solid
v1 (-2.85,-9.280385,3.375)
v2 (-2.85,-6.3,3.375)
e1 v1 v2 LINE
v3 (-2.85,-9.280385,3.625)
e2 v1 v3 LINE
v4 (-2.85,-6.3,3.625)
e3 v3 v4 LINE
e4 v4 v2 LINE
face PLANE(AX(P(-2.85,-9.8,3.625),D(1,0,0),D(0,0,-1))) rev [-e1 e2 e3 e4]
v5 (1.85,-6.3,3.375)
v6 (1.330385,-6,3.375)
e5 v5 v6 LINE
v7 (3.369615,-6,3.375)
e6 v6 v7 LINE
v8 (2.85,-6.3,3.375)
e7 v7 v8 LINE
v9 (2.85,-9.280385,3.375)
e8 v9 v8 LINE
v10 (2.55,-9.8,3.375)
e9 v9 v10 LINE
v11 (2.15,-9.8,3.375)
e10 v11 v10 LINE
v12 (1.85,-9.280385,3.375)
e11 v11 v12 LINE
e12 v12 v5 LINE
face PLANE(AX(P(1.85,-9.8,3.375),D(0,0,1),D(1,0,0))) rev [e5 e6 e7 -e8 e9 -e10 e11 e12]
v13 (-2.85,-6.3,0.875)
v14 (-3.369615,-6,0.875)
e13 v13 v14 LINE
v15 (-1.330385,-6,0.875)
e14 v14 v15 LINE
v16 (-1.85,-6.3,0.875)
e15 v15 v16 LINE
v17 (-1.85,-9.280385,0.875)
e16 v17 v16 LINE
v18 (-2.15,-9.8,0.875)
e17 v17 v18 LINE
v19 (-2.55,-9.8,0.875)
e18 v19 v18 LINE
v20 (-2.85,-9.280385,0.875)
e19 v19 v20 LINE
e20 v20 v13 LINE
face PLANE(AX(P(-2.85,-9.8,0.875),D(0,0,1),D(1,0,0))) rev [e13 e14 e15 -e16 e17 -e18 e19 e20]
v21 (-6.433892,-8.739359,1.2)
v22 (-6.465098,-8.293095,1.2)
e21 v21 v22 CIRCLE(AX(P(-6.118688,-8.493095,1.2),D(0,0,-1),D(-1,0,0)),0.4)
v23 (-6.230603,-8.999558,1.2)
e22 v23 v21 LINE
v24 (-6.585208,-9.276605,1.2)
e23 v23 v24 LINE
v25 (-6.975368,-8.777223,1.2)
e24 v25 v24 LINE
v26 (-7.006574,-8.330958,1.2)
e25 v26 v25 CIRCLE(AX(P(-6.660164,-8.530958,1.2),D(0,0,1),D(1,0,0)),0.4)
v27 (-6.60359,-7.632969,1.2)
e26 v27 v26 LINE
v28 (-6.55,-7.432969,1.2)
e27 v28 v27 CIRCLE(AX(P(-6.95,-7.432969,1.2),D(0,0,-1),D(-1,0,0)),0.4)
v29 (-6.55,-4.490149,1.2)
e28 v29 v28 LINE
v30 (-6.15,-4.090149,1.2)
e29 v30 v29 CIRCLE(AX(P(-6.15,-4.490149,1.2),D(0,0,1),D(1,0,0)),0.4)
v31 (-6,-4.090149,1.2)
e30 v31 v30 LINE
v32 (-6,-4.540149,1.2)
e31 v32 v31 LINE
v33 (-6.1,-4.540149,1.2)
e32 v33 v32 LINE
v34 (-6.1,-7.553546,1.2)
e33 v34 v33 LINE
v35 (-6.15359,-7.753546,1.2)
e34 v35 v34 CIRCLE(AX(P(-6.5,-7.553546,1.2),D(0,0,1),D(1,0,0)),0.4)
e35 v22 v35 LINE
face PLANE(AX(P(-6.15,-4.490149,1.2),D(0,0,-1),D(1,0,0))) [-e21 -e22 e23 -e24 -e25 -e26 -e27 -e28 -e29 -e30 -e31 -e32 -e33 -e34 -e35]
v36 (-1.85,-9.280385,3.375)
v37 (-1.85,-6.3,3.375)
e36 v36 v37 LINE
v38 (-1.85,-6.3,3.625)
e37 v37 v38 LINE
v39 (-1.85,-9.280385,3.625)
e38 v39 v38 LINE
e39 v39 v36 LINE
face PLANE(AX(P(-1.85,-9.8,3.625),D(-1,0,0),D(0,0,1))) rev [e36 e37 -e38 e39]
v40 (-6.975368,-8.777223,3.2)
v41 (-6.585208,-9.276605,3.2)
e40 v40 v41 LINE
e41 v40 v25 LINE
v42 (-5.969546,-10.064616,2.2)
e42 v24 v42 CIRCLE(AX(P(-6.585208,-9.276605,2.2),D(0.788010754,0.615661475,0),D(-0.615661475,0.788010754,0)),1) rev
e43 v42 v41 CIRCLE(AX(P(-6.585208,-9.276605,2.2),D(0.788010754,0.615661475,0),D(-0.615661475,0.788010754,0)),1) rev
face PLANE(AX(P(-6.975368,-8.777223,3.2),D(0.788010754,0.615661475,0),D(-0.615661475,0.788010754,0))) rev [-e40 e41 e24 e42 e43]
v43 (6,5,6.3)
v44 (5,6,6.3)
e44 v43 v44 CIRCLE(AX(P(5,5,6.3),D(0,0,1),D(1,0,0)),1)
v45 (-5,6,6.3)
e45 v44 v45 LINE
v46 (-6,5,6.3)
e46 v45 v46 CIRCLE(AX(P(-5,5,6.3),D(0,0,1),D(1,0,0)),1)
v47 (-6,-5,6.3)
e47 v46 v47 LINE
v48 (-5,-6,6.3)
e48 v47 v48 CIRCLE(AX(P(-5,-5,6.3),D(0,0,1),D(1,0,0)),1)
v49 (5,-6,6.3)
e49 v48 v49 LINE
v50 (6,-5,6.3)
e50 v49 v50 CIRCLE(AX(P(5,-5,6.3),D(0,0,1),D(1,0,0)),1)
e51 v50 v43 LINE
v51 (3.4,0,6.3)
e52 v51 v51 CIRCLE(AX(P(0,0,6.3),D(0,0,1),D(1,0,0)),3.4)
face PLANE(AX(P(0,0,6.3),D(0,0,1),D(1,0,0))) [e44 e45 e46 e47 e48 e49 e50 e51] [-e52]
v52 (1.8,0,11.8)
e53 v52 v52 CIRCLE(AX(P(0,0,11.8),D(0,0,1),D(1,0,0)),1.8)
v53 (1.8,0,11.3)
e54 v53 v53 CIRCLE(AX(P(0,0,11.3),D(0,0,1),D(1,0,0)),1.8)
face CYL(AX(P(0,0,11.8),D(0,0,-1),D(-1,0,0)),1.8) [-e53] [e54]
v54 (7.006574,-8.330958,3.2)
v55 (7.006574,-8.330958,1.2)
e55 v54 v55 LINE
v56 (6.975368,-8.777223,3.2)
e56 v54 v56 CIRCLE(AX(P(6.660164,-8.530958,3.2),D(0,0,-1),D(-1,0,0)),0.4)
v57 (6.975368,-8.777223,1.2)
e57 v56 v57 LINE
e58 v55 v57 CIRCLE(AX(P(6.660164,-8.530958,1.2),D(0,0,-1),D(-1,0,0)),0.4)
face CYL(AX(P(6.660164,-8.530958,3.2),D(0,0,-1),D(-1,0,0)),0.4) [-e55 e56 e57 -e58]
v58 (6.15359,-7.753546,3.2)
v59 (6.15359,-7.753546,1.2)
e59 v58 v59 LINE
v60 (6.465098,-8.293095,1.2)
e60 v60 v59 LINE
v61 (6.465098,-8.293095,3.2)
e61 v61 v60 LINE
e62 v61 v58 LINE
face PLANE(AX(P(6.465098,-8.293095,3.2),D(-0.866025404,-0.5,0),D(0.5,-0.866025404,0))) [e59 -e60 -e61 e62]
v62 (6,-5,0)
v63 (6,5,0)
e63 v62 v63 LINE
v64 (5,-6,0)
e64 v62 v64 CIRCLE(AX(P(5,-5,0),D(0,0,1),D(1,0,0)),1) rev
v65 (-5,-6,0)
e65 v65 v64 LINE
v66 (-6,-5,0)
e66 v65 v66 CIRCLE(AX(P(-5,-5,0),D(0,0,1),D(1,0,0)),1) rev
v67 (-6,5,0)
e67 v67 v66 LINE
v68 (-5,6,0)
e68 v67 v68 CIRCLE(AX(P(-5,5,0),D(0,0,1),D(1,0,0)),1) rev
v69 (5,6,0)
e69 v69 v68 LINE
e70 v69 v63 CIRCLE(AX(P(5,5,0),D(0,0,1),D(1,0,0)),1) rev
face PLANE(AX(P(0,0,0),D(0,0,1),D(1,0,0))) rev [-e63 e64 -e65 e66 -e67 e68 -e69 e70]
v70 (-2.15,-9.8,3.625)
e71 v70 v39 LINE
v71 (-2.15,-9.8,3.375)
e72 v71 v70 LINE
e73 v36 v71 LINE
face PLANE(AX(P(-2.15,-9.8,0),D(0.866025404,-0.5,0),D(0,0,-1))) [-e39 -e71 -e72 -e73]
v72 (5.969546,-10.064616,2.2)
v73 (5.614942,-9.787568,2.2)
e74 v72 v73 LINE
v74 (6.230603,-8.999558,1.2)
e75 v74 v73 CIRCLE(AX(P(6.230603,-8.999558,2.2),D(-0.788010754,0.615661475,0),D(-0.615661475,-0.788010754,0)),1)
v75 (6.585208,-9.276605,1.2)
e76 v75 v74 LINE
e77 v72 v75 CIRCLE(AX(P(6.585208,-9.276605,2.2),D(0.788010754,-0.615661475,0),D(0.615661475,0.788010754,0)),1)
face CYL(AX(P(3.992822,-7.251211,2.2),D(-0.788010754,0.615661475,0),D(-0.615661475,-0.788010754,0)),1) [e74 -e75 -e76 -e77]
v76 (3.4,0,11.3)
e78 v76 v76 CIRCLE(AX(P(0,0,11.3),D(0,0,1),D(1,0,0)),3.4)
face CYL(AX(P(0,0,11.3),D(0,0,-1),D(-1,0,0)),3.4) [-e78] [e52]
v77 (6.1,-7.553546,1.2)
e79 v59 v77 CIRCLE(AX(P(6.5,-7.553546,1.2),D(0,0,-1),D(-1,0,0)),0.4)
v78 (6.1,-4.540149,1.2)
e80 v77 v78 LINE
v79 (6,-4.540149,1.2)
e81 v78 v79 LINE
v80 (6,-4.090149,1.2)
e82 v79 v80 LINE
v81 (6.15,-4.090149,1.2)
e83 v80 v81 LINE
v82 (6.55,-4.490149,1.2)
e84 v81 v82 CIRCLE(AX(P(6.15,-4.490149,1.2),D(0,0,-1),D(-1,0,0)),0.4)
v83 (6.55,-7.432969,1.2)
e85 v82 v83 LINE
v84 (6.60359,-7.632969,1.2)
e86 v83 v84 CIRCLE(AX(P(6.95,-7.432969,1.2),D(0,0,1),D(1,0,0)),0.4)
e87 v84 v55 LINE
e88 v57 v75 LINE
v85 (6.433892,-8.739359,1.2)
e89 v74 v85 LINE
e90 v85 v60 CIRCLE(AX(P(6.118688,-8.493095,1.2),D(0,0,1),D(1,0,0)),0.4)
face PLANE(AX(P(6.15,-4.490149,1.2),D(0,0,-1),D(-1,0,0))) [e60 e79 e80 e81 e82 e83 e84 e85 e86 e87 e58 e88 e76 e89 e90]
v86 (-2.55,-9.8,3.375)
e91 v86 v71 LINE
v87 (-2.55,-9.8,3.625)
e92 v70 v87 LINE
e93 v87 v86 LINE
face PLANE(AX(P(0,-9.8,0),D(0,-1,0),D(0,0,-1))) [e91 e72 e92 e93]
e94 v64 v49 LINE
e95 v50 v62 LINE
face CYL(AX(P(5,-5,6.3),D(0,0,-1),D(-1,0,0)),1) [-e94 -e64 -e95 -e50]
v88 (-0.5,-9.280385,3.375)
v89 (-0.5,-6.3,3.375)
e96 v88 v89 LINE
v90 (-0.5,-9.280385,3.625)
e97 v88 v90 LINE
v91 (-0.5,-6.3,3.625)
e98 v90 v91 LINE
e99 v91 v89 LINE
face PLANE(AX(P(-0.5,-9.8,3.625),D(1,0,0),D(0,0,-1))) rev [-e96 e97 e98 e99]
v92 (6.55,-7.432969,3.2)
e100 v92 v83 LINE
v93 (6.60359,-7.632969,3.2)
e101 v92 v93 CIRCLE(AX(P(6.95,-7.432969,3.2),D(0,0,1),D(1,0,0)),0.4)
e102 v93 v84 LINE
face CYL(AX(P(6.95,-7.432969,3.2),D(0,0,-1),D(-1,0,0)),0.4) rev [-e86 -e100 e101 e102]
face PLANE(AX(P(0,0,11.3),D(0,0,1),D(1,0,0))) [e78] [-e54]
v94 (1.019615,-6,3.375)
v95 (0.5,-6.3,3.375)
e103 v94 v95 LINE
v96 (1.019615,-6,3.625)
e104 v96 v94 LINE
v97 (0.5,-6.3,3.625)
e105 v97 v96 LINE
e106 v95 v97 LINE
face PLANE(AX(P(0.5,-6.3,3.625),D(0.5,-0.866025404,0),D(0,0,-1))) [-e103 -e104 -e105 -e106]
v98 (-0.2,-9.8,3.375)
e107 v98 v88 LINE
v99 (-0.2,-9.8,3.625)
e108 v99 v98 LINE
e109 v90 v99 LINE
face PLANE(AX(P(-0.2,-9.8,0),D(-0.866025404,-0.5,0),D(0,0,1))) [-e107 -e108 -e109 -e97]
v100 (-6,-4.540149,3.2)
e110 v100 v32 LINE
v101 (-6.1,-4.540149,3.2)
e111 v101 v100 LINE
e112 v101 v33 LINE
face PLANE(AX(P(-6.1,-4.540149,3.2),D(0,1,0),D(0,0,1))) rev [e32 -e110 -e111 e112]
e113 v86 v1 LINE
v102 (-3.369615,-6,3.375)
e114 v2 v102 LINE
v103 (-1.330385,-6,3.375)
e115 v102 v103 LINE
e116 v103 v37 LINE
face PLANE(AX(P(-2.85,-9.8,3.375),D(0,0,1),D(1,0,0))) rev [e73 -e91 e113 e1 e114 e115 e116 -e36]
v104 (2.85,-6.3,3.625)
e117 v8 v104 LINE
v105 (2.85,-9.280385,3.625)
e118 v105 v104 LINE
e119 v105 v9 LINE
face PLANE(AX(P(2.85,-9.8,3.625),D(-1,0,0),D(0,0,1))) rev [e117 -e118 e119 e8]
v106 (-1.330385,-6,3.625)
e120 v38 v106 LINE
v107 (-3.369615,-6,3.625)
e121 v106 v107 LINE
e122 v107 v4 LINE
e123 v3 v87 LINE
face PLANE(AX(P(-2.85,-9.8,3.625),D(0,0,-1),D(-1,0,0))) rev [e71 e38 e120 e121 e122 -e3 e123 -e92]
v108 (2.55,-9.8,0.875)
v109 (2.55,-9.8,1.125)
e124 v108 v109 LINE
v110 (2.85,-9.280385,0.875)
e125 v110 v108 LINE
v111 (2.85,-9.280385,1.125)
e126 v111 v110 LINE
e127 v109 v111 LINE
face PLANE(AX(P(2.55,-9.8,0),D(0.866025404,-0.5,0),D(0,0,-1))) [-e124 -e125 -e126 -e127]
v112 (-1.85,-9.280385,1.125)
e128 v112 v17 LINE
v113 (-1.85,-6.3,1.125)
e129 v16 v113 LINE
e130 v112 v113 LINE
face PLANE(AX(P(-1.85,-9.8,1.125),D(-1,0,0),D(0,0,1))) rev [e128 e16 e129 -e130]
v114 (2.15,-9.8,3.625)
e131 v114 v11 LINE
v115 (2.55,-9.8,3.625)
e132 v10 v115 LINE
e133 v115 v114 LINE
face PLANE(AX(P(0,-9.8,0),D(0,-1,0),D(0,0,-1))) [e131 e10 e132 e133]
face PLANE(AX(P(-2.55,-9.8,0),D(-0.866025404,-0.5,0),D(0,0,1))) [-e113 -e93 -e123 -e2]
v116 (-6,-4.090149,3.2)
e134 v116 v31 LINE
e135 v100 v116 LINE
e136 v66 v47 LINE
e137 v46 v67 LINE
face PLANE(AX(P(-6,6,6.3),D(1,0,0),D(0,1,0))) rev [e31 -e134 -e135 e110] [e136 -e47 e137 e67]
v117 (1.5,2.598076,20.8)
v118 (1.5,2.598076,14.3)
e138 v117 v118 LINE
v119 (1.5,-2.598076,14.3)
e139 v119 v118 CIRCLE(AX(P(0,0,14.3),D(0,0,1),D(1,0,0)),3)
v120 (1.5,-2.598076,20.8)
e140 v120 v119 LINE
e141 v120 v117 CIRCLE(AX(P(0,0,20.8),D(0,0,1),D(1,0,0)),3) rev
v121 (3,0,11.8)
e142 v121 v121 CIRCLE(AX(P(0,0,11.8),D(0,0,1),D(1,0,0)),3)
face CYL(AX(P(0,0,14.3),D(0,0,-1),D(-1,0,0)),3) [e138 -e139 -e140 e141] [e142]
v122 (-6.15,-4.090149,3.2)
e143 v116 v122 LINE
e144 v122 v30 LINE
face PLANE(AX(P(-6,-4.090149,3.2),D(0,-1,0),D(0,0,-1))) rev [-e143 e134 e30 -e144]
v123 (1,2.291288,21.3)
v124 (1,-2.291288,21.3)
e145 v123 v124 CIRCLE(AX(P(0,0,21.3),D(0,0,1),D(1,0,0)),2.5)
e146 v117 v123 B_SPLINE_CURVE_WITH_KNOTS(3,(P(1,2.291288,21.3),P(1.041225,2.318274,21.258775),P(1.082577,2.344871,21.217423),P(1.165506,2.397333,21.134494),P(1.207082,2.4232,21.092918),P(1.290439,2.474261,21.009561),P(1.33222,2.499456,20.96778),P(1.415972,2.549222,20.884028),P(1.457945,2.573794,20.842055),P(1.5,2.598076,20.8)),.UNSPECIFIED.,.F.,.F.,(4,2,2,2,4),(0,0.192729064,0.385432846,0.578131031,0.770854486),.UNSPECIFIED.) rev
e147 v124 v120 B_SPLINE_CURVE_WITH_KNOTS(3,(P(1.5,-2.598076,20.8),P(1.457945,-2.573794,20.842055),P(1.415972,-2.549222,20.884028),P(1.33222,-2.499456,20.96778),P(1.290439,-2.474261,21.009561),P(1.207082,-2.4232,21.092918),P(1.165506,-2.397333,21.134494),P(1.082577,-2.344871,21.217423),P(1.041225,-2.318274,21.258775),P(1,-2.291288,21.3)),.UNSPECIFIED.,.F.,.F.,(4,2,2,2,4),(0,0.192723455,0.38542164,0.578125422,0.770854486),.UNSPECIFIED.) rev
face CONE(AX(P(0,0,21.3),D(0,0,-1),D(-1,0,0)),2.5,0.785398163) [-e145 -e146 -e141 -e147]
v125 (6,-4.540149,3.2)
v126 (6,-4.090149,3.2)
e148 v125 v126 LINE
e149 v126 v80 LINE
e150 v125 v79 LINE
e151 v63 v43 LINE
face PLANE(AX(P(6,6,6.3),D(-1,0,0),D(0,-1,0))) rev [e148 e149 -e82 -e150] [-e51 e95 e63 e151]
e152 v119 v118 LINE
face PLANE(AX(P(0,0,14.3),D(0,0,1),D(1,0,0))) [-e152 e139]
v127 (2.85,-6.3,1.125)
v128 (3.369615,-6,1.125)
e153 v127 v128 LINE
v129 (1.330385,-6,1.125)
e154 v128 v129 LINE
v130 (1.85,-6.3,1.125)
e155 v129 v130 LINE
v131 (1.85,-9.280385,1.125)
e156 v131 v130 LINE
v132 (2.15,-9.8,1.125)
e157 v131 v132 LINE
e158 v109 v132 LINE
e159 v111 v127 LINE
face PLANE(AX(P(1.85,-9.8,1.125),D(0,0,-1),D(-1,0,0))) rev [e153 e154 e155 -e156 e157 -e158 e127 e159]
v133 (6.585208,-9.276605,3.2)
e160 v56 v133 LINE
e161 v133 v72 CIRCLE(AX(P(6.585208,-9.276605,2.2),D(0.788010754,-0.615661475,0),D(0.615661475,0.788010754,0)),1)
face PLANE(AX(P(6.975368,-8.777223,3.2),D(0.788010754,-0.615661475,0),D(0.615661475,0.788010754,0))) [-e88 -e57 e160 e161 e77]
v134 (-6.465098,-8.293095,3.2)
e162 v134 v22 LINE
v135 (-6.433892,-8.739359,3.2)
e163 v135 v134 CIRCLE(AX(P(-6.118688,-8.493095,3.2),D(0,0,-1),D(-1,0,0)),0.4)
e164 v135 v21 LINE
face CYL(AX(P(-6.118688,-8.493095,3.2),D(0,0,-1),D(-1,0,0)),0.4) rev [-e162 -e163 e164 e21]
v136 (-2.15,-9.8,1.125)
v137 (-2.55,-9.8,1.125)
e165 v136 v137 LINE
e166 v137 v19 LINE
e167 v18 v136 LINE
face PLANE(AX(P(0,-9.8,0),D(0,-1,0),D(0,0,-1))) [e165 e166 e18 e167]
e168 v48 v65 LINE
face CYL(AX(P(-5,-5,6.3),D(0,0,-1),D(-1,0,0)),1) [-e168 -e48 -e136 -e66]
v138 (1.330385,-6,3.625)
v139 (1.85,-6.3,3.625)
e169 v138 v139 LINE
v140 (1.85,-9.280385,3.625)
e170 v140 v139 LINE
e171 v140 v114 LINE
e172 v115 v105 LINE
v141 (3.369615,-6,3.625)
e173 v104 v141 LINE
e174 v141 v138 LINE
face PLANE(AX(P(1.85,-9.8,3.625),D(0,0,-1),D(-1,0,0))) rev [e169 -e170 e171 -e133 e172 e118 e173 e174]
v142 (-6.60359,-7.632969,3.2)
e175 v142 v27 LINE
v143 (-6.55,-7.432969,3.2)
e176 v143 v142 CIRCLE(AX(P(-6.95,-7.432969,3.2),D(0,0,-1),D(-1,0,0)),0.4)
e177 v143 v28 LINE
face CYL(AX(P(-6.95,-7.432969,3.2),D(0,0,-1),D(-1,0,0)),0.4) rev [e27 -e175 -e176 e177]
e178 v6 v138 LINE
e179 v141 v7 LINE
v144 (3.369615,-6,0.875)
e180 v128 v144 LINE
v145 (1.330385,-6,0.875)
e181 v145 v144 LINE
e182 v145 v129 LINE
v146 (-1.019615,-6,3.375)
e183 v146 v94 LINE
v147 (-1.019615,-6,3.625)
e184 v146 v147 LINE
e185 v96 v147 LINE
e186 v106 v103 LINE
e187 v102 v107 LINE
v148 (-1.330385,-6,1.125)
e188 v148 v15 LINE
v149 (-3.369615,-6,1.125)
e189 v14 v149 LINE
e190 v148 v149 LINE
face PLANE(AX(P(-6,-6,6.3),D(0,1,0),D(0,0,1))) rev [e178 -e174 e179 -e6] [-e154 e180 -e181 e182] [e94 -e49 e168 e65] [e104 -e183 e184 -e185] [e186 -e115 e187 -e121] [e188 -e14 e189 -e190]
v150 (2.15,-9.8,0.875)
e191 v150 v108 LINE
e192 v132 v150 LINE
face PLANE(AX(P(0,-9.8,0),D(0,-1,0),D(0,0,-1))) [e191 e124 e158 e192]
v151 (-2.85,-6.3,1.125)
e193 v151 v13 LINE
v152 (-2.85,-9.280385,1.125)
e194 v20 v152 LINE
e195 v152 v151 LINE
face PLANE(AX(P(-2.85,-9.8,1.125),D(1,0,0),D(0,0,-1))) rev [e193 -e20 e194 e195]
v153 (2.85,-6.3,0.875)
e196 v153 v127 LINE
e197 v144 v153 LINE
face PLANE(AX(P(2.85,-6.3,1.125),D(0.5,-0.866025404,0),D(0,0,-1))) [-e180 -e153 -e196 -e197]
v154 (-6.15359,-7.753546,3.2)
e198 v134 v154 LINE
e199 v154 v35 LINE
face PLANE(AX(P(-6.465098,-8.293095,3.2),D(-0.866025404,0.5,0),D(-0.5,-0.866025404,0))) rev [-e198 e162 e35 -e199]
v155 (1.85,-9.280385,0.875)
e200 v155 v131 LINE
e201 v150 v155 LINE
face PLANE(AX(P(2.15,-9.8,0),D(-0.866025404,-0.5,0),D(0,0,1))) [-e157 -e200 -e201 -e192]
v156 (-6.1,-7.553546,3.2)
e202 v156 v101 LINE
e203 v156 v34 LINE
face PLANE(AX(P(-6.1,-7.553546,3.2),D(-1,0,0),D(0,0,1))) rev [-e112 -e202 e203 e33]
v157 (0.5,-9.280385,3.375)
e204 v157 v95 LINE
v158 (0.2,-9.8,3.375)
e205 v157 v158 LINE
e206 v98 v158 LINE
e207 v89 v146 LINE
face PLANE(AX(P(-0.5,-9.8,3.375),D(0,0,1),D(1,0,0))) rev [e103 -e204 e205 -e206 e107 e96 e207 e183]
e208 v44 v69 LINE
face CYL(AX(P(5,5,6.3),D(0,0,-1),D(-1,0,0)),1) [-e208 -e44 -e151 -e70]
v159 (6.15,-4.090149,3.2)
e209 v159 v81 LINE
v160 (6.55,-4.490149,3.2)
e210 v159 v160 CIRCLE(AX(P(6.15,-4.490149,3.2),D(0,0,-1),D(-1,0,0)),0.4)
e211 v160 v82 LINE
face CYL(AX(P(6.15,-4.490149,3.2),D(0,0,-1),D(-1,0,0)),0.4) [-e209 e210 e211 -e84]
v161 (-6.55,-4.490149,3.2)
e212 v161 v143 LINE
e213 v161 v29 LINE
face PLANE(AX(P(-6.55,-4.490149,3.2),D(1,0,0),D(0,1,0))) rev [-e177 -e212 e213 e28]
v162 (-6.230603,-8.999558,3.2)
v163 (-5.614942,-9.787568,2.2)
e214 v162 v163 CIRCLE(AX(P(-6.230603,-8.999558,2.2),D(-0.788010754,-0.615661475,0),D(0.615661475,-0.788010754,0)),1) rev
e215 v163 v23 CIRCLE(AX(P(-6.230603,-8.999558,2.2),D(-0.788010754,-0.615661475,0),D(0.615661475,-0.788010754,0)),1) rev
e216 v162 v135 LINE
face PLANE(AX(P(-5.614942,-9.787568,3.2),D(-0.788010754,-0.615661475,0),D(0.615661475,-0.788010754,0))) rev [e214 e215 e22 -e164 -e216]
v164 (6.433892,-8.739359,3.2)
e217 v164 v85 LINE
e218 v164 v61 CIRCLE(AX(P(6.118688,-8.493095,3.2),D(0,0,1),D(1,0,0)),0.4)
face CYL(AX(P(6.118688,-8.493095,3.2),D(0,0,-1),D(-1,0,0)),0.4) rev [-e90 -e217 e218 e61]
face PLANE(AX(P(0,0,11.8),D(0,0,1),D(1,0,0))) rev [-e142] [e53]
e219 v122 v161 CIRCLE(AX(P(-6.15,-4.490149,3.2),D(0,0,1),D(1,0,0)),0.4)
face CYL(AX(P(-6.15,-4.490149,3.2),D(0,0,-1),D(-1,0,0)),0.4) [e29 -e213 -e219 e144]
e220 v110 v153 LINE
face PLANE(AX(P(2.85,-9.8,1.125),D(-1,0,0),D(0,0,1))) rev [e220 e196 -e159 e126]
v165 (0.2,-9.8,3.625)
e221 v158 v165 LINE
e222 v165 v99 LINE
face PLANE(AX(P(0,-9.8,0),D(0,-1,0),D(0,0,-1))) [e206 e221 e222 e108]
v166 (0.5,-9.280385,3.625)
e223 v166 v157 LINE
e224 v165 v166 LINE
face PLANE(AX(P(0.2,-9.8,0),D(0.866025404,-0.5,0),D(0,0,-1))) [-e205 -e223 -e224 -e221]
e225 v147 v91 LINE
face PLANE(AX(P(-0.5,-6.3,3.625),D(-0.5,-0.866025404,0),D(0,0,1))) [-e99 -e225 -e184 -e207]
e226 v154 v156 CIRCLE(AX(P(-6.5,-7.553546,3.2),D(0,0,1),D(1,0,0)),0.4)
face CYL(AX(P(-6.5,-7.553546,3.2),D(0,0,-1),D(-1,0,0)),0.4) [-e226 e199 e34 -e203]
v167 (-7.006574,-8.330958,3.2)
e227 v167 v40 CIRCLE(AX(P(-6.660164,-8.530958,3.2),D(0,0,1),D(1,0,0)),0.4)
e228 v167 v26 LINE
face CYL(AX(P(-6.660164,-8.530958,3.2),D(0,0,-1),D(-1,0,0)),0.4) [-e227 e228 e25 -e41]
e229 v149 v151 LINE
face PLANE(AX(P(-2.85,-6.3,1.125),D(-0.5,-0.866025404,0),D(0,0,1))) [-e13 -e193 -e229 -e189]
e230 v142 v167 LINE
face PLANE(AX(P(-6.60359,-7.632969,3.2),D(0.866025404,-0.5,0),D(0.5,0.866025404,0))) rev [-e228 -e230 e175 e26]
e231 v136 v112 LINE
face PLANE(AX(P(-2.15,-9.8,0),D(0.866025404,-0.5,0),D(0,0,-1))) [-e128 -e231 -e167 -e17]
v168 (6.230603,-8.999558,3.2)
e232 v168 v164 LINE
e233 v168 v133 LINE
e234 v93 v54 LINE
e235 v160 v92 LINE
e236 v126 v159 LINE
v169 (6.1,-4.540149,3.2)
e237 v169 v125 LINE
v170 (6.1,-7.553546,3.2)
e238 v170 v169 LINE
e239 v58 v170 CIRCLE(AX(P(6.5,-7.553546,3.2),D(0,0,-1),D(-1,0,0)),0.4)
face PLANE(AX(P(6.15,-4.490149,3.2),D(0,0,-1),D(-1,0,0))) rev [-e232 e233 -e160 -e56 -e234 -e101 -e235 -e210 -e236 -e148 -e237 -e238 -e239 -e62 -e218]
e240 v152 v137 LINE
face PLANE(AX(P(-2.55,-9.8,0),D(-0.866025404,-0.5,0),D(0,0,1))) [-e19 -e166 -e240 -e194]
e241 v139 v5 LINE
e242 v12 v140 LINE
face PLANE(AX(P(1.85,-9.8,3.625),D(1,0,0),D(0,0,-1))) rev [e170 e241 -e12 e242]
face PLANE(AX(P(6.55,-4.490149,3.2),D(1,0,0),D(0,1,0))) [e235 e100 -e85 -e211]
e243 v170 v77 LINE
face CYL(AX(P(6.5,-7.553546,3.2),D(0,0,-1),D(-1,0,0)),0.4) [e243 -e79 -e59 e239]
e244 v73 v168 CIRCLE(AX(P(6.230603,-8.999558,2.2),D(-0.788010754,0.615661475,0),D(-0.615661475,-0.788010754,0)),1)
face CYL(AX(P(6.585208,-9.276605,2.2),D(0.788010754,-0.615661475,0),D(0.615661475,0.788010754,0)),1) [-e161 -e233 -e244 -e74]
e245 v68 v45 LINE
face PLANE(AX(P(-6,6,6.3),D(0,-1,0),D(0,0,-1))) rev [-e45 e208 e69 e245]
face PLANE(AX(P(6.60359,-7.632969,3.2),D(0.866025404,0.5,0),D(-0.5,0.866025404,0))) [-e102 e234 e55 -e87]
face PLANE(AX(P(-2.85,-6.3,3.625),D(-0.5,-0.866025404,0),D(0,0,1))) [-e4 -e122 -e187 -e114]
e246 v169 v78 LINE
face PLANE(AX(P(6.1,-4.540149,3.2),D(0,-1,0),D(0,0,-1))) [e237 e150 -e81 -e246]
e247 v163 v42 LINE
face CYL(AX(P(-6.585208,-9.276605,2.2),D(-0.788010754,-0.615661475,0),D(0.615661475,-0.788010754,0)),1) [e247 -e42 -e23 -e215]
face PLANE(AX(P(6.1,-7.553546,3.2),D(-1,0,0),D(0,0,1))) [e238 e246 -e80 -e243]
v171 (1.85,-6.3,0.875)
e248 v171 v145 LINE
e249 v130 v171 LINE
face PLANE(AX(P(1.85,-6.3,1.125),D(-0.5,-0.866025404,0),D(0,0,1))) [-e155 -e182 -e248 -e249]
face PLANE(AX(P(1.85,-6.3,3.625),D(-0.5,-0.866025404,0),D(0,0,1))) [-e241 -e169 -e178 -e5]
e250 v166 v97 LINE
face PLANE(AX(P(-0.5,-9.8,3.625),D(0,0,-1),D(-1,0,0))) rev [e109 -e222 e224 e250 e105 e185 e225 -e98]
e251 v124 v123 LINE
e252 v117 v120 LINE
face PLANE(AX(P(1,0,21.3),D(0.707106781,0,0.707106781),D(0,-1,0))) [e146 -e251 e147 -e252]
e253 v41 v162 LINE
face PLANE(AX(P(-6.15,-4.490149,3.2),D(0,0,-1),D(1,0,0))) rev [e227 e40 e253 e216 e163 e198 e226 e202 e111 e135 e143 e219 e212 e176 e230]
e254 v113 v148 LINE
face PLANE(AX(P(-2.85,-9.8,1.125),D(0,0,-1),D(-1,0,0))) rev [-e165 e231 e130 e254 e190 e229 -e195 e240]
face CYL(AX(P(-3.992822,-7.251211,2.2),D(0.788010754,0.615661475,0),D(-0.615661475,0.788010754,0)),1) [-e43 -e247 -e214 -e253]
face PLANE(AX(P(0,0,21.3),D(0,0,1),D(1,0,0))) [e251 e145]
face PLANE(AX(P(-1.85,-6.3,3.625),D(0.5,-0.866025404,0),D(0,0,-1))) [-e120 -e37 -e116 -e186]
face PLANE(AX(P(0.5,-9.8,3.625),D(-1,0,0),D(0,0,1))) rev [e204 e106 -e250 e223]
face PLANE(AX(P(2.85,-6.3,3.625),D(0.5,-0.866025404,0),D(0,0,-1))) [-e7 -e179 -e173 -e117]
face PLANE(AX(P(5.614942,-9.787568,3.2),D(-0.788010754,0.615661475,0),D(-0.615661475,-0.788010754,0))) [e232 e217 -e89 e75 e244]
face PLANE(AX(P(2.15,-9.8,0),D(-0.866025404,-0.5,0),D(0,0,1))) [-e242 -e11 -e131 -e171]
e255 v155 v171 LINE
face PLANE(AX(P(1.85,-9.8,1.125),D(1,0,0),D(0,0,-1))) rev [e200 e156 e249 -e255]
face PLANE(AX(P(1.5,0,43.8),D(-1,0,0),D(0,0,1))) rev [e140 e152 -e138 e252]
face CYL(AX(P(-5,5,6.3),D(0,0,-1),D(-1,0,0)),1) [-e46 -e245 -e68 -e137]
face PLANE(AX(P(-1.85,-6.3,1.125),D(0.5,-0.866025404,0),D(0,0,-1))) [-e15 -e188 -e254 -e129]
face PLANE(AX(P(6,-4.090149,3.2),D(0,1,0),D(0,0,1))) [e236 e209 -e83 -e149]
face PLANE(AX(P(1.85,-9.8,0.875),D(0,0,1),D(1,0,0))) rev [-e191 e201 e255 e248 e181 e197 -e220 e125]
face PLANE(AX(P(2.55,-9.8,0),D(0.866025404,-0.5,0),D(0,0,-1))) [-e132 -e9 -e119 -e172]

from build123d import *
from OCP.BRepFilletAPI import BRepFilletAPI_MakeChamfer

# Parameters (mm, degrees)
ESQUISSE1_W           = 12
ESQUISSE1_H           = 12
BOSS_EXTRU_1_DEPTH    = 6.3
ESQUISSE2_R           = 3.4
BOSS_EXTRU_2_DEPTH    = 5
ESQUISSE5_R           = 1.8
BOSS_EXTRU_5_DEPTH    = 0.5
ESQUISSE3_R           = 3
BOSS_EXTRU_3_DEPTH    = 2.5
BOSS_EXTRU_6_START    = 2.5
BOSS_EXTRU_6_DEPTH    = 7
ESQUISSE4_W           = 1
ESQUISSE4_H           = 0.25
BOSS_EXTRU_4_DEPTH    = 3.8
CHANFREIN1_SIZE       = 0.5
CONG_1_R              = 1
CHANFREIN2_SIZE       = 0.3
CHANFREIN2_SIZE2      = 0.519615242
BOSS_EXTRU_7_START    = -1.2
BOSS_EXTRU_7_DEPTH    = 2
CONG_2_R              = 1
CONG_2_OF_SYM_TRIE1_R = 1


with BuildPart() as part:
    # Esquisse1 → Boss.-Extru.1 (new body)
    with BuildSketch(Plane.XY):
        Rectangle(ESQUISSE1_W, ESQUISSE1_H)
    extrude(amount=BOSS_EXTRU_1_DEPTH)

    # Esquisse2 → Boss.-Extru.2 (add)
    with BuildSketch(Plane.XY.offset(6.3)):
        Circle(ESQUISSE2_R)
    extrude(amount=BOSS_EXTRU_2_DEPTH)

    # Esquisse5 → Boss.-Extru.5 (add)
    with BuildSketch(Plane.XY.offset(11.3)):
        Circle(ESQUISSE5_R)
    extrude(amount=BOSS_EXTRU_5_DEPTH)

    # Esquisse3 → Boss.-Extru.3 (add)
    with BuildSketch(Plane.XY.offset(11.8)):
        Circle(ESQUISSE3_R)
    extrude(amount=BOSS_EXTRU_3_DEPTH)

    # Esquisse3<4> → Boss.-Extru.6 (add)
    with BuildSketch(Plane.XY.offset(11.8).offset(BOSS_EXTRU_6_START)):
        with BuildLine():
            Line((1.5, 0.994987437), (1.5, 2.598076211))
            ThreePointArc((1.5, 2.598076211), (-3, 0), (1.5, -2.598076211))
            Line((1.5, -2.598076211), (1.5, -0.994987437))
            ThreePointArc((1.5, -0.994987437), (-1.8, 0), (1.5, 0.994987437))
        make_face()
        with BuildLine():
            Line((1.5, -0.994987437), (1.5, 0.994987437))
            ThreePointArc((1.5, 0.994987437), (-1.8, 0), (1.5, -0.994987437))
        make_face()
    extrude(amount=BOSS_EXTRU_6_DEPTH)

    # Esquisse4 → Boss.-Extru.4 (add)
    with BuildSketch(Plane.XZ.offset(6)):
        with Locations((0, 3.5)):
            Rectangle(ESQUISSE4_W, ESQUISSE4_H)
        with Locations((2.35, 3.5)):
            Rectangle(ESQUISSE4_W, ESQUISSE4_H)
        with Locations((-2.35, 3.5)):
            Rectangle(ESQUISSE4_W, ESQUISSE4_H)
        with Locations((-2.35, 1)):
            Rectangle(ESQUISSE4_W, ESQUISSE4_H)
        with Locations((2.35, 1)):
            Rectangle(ESQUISSE4_W, ESQUISSE4_H)
    extrude(amount=BOSS_EXTRU_4_DEPTH)

    # Chanfrein1
    chanfrein1_edges = [part.edges().sort_by_distance(p)[0] for p in [
        (1.5, 0, 21.3),
        (-3, 0, 21.3),
    ]]
    chamfer(chanfrein1_edges, length=CHANFREIN1_SIZE)

    # Congé1
    cong_1_edges = [part.edges().sort_by_distance(p)[0] for p in [
        (6, -6, 3.15),
        (-6, -6, 3.15),
        (-6, 6, 3.15),
        (6, 6, 3.15),
    ]]
    fillet(cong_1_edges, radius=CONG_1_R)

    # Chanfrein2: one chamfer whose edges measure the first distance from different faces: ONE call of the kernel's chamfer builder (chamfer() names one face for all edges)
    chanfrein2_edges_1 = [part.edges().sort_by_distance(p)[0] for p in [
        (0.5, -6, 3.5),
    ]]
    chanfrein2_side_1 = [part.faces().sort_by_distance(p)[0] for p in [
        (0.5, -7.9, 3.5),
    ]]
    chanfrein2_edges_2 = [part.edges().sort_by_distance(p)[0] for p in [
        (-0.5, -6, 3.5),
    ]]
    chanfrein2_side_2 = [part.faces().sort_by_distance(p)[0] for p in [
        (-0.5, -7.9, 3.5),
    ]]
    chanfrein2_edges_3 = [part.edges().sort_by_distance(p)[0] for p in [
        (0.5, -9.8, 3.5),
        (-0.5, -9.8, 3.5),
    ]]
    chanfrein2_side_3 = [part.faces().sort_by_distance(p)[0] for p in [
        (0, -9.8, 3.5),
    ]]
    chanfrein2_edges_4 = [part.edges().sort_by_distance(p)[0] for p in [
        (2.85, -6, 3.5),
    ]]
    chanfrein2_side_4 = [part.faces().sort_by_distance(p)[0] for p in [
        (2.85, -7.9, 3.5),
    ]]
    chanfrein2_edges_5 = [part.edges().sort_by_distance(p)[0] for p in [
        (1.85, -6, 3.5),
    ]]
    chanfrein2_side_5 = [part.faces().sort_by_distance(p)[0] for p in [
        (1.85, -7.9, 3.5),
    ]]
    chanfrein2_edges_6 = [part.edges().sort_by_distance(p)[0] for p in [
        (2.85, -9.8, 3.5),
        (1.85, -9.8, 3.5),
    ]]
    chanfrein2_side_6 = [part.faces().sort_by_distance(p)[0] for p in [
        (2.35, -9.8, 3.5),
    ]]
    chanfrein2_edges_7 = [part.edges().sort_by_distance(p)[0] for p in [
        (-1.85, -6, 3.5),
    ]]
    chanfrein2_side_7 = [part.faces().sort_by_distance(p)[0] for p in [
        (-1.85, -7.9, 3.5),
    ]]
    chanfrein2_edges_8 = [part.edges().sort_by_distance(p)[0] for p in [
        (-2.85, -6, 3.5),
    ]]
    chanfrein2_side_8 = [part.faces().sort_by_distance(p)[0] for p in [
        (-2.85, -7.9, 3.5),
    ]]
    chanfrein2_edges_9 = [part.edges().sort_by_distance(p)[0] for p in [
        (-1.85, -9.8, 3.5),
        (-2.85, -9.8, 3.5),
    ]]
    chanfrein2_side_9 = [part.faces().sort_by_distance(p)[0] for p in [
        (-2.35, -9.8, 3.5),
    ]]
    chanfrein2_edges_10 = [part.edges().sort_by_distance(p)[0] for p in [
        (-1.85, -6, 1),
    ]]
    chanfrein2_side_10 = [part.faces().sort_by_distance(p)[0] for p in [
        (-1.85, -7.9, 1),
    ]]
    chanfrein2_edges_11 = [part.edges().sort_by_distance(p)[0] for p in [
        (-2.85, -6, 1),
    ]]
    chanfrein2_side_11 = [part.faces().sort_by_distance(p)[0] for p in [
        (-2.85, -7.9, 1),
    ]]
    chanfrein2_edges_12 = [part.edges().sort_by_distance(p)[0] for p in [
        (-1.85, -9.8, 1),
        (-2.85, -9.8, 1),
    ]]
    chanfrein2_side_12 = [part.faces().sort_by_distance(p)[0] for p in [
        (-2.35, -9.8, 1),
    ]]
    chanfrein2_edges_13 = [part.edges().sort_by_distance(p)[0] for p in [
        (2.85, -6, 1),
    ]]
    chanfrein2_side_13 = [part.faces().sort_by_distance(p)[0] for p in [
        (2.85, -7.9, 1),
    ]]
    chanfrein2_edges_14 = [part.edges().sort_by_distance(p)[0] for p in [
        (1.85, -6, 1),
    ]]
    chanfrein2_side_14 = [part.faces().sort_by_distance(p)[0] for p in [
        (1.85, -7.9, 1),
    ]]
    chanfrein2_edges_15 = [part.edges().sort_by_distance(p)[0] for p in [
        (2.85, -9.8, 1),
        (1.85, -9.8, 1),
    ]]
    chanfrein2_side_15 = [part.faces().sort_by_distance(p)[0] for p in [
        (2.35, -9.8, 1),
    ]]
    chanfrein2 = BRepFilletAPI_MakeChamfer(part.part.solid().wrapped)
    for e in chanfrein2_edges_1:
        chanfrein2.Add(CHANFREIN2_SIZE, CHANFREIN2_SIZE2, e.wrapped, chanfrein2_side_1[0].wrapped)  # the first distance lies on this face
    for e in chanfrein2_edges_2:
        chanfrein2.Add(CHANFREIN2_SIZE, CHANFREIN2_SIZE2, e.wrapped, chanfrein2_side_2[0].wrapped)  # the first distance lies on this face
    for e in chanfrein2_edges_3:
        chanfrein2.Add(CHANFREIN2_SIZE, CHANFREIN2_SIZE2, e.wrapped, chanfrein2_side_3[0].wrapped)  # the first distance lies on this face
    for e in chanfrein2_edges_4:
        chanfrein2.Add(CHANFREIN2_SIZE, CHANFREIN2_SIZE2, e.wrapped, chanfrein2_side_4[0].wrapped)  # the first distance lies on this face
    for e in chanfrein2_edges_5:
        chanfrein2.Add(CHANFREIN2_SIZE, CHANFREIN2_SIZE2, e.wrapped, chanfrein2_side_5[0].wrapped)  # the first distance lies on this face
    for e in chanfrein2_edges_6:
        chanfrein2.Add(CHANFREIN2_SIZE, CHANFREIN2_SIZE2, e.wrapped, chanfrein2_side_6[0].wrapped)  # the first distance lies on this face
    for e in chanfrein2_edges_7:
        chanfrein2.Add(CHANFREIN2_SIZE, CHANFREIN2_SIZE2, e.wrapped, chanfrein2_side_7[0].wrapped)  # the first distance lies on this face
    for e in chanfrein2_edges_8:
        chanfrein2.Add(CHANFREIN2_SIZE, CHANFREIN2_SIZE2, e.wrapped, chanfrein2_side_8[0].wrapped)  # the first distance lies on this face
    for e in chanfrein2_edges_9:
        chanfrein2.Add(CHANFREIN2_SIZE, CHANFREIN2_SIZE2, e.wrapped, chanfrein2_side_9[0].wrapped)  # the first distance lies on this face
    for e in chanfrein2_edges_10:
        chanfrein2.Add(CHANFREIN2_SIZE, CHANFREIN2_SIZE2, e.wrapped, chanfrein2_side_10[0].wrapped)  # the first distance lies on this face
    for e in chanfrein2_edges_11:
        chanfrein2.Add(CHANFREIN2_SIZE, CHANFREIN2_SIZE2, e.wrapped, chanfrein2_side_11[0].wrapped)  # the first distance lies on this face
    for e in chanfrein2_edges_12:
        chanfrein2.Add(CHANFREIN2_SIZE, CHANFREIN2_SIZE2, e.wrapped, chanfrein2_side_12[0].wrapped)  # the first distance lies on this face
    for e in chanfrein2_edges_13:
        chanfrein2.Add(CHANFREIN2_SIZE, CHANFREIN2_SIZE2, e.wrapped, chanfrein2_side_13[0].wrapped)  # the first distance lies on this face
    for e in chanfrein2_edges_14:
        chanfrein2.Add(CHANFREIN2_SIZE, CHANFREIN2_SIZE2, e.wrapped, chanfrein2_side_14[0].wrapped)  # the first distance lies on this face
    for e in chanfrein2_edges_15:
        chanfrein2.Add(CHANFREIN2_SIZE, CHANFREIN2_SIZE2, e.wrapped, chanfrein2_side_15[0].wrapped)  # the first distance lies on this face
    add(Compound.cast(chanfrein2.Shape()), mode=Mode.REPLACE)

    # Esquisse6 → Boss.-Extru.7 (add)
    with BuildSketch(Plane(origin=(0, 0, 0), x_dir=(-1, 0, 0), z_dir=(0, 0, -1)).offset(BOSS_EXTRU_7_START)):
        with BuildLine():
            Line((-6, -4.090148625), (-6.15, -4.090148625))
            ThreePointArc((-6.15, -4.090148625), (-6.432842712, -4.207305912), (-6.55, -4.490148625))
            Line((-6.55, -4.490148625), (-6.55, -7.432968948))
            ThreePointArc((-6.55, -7.432968948), (-6.563629669, -7.536496566), (-6.603589838, -7.632968948))
            Line((-6.603589838, -7.632968948), (-7.006574145, -8.330958241))
            ThreePointArc((-7.006574145, -8.330958241), (-7.059189603, -8.55886083), (-6.975368285, -8.777222831))
            Line((-6.975368285, -8.777222831), (-5.969546479, -10.064616035))
            Line((-5.969546479, -10.064616035), (-5.614941639, -9.787568371))
            Line((-5.614941639, -9.787568371), (-6.433892437, -8.739359151))
            ThreePointArc((-6.433892437, -8.739359151), (-6.517713755, -8.52099715), (-6.465098297, -8.293094561))
            Line((-6.465098297, -8.293094561), (-6.153589838, -7.753546084))
            ThreePointArc((-6.153589838, -7.753546084), (-6.113629669, -7.657073702), (-6.1, -7.553546084))
            Line((-6.1, -7.553546084), (-6.1, -4.540148625))
            Line((-6.1, -4.540148625), (-6, -4.540148625))
            Line((-6, -4.540148625), (-6, -4.090148625))
        make_face()
    boss_extru_7 = extrude(amount=-BOSS_EXTRU_7_DEPTH)

    # Congé2
    cong_2_edges = [part.edges().sort_by_distance(p)[0] for p in [
        (5.792244059, -9.926092203, 1.2),
        (5.792244059, -9.926092203, 3.2),
    ]]
    fillet(cong_2_edges, radius=CONG_2_R - 0.0001)  # a hair under: the kernel refuses the full size

    # Symétrie1: Boss.-Extru.7 across plane
    add(boss_extru_7.mirror(Plane(origin=(0, 0, 0), x_dir=(0, 0, 1), z_dir=(1, 0, 0))))

    # Congé2 of Symétrie1
    cong_2_of_sym_trie1_edges = [part.edges().sort_by_distance(p)[0] for p in [
        (-5.792244059, -9.926092203, 1.2),
        (-5.792244059, -9.926092203, 3.2),
    ]]
    fillet(cong_2_of_sym_trie1_edges, radius=CONG_2_OF_SYM_TRIE1_R - 0.0001)  # a hair under: the kernel refuses the full size


solid = part.part
